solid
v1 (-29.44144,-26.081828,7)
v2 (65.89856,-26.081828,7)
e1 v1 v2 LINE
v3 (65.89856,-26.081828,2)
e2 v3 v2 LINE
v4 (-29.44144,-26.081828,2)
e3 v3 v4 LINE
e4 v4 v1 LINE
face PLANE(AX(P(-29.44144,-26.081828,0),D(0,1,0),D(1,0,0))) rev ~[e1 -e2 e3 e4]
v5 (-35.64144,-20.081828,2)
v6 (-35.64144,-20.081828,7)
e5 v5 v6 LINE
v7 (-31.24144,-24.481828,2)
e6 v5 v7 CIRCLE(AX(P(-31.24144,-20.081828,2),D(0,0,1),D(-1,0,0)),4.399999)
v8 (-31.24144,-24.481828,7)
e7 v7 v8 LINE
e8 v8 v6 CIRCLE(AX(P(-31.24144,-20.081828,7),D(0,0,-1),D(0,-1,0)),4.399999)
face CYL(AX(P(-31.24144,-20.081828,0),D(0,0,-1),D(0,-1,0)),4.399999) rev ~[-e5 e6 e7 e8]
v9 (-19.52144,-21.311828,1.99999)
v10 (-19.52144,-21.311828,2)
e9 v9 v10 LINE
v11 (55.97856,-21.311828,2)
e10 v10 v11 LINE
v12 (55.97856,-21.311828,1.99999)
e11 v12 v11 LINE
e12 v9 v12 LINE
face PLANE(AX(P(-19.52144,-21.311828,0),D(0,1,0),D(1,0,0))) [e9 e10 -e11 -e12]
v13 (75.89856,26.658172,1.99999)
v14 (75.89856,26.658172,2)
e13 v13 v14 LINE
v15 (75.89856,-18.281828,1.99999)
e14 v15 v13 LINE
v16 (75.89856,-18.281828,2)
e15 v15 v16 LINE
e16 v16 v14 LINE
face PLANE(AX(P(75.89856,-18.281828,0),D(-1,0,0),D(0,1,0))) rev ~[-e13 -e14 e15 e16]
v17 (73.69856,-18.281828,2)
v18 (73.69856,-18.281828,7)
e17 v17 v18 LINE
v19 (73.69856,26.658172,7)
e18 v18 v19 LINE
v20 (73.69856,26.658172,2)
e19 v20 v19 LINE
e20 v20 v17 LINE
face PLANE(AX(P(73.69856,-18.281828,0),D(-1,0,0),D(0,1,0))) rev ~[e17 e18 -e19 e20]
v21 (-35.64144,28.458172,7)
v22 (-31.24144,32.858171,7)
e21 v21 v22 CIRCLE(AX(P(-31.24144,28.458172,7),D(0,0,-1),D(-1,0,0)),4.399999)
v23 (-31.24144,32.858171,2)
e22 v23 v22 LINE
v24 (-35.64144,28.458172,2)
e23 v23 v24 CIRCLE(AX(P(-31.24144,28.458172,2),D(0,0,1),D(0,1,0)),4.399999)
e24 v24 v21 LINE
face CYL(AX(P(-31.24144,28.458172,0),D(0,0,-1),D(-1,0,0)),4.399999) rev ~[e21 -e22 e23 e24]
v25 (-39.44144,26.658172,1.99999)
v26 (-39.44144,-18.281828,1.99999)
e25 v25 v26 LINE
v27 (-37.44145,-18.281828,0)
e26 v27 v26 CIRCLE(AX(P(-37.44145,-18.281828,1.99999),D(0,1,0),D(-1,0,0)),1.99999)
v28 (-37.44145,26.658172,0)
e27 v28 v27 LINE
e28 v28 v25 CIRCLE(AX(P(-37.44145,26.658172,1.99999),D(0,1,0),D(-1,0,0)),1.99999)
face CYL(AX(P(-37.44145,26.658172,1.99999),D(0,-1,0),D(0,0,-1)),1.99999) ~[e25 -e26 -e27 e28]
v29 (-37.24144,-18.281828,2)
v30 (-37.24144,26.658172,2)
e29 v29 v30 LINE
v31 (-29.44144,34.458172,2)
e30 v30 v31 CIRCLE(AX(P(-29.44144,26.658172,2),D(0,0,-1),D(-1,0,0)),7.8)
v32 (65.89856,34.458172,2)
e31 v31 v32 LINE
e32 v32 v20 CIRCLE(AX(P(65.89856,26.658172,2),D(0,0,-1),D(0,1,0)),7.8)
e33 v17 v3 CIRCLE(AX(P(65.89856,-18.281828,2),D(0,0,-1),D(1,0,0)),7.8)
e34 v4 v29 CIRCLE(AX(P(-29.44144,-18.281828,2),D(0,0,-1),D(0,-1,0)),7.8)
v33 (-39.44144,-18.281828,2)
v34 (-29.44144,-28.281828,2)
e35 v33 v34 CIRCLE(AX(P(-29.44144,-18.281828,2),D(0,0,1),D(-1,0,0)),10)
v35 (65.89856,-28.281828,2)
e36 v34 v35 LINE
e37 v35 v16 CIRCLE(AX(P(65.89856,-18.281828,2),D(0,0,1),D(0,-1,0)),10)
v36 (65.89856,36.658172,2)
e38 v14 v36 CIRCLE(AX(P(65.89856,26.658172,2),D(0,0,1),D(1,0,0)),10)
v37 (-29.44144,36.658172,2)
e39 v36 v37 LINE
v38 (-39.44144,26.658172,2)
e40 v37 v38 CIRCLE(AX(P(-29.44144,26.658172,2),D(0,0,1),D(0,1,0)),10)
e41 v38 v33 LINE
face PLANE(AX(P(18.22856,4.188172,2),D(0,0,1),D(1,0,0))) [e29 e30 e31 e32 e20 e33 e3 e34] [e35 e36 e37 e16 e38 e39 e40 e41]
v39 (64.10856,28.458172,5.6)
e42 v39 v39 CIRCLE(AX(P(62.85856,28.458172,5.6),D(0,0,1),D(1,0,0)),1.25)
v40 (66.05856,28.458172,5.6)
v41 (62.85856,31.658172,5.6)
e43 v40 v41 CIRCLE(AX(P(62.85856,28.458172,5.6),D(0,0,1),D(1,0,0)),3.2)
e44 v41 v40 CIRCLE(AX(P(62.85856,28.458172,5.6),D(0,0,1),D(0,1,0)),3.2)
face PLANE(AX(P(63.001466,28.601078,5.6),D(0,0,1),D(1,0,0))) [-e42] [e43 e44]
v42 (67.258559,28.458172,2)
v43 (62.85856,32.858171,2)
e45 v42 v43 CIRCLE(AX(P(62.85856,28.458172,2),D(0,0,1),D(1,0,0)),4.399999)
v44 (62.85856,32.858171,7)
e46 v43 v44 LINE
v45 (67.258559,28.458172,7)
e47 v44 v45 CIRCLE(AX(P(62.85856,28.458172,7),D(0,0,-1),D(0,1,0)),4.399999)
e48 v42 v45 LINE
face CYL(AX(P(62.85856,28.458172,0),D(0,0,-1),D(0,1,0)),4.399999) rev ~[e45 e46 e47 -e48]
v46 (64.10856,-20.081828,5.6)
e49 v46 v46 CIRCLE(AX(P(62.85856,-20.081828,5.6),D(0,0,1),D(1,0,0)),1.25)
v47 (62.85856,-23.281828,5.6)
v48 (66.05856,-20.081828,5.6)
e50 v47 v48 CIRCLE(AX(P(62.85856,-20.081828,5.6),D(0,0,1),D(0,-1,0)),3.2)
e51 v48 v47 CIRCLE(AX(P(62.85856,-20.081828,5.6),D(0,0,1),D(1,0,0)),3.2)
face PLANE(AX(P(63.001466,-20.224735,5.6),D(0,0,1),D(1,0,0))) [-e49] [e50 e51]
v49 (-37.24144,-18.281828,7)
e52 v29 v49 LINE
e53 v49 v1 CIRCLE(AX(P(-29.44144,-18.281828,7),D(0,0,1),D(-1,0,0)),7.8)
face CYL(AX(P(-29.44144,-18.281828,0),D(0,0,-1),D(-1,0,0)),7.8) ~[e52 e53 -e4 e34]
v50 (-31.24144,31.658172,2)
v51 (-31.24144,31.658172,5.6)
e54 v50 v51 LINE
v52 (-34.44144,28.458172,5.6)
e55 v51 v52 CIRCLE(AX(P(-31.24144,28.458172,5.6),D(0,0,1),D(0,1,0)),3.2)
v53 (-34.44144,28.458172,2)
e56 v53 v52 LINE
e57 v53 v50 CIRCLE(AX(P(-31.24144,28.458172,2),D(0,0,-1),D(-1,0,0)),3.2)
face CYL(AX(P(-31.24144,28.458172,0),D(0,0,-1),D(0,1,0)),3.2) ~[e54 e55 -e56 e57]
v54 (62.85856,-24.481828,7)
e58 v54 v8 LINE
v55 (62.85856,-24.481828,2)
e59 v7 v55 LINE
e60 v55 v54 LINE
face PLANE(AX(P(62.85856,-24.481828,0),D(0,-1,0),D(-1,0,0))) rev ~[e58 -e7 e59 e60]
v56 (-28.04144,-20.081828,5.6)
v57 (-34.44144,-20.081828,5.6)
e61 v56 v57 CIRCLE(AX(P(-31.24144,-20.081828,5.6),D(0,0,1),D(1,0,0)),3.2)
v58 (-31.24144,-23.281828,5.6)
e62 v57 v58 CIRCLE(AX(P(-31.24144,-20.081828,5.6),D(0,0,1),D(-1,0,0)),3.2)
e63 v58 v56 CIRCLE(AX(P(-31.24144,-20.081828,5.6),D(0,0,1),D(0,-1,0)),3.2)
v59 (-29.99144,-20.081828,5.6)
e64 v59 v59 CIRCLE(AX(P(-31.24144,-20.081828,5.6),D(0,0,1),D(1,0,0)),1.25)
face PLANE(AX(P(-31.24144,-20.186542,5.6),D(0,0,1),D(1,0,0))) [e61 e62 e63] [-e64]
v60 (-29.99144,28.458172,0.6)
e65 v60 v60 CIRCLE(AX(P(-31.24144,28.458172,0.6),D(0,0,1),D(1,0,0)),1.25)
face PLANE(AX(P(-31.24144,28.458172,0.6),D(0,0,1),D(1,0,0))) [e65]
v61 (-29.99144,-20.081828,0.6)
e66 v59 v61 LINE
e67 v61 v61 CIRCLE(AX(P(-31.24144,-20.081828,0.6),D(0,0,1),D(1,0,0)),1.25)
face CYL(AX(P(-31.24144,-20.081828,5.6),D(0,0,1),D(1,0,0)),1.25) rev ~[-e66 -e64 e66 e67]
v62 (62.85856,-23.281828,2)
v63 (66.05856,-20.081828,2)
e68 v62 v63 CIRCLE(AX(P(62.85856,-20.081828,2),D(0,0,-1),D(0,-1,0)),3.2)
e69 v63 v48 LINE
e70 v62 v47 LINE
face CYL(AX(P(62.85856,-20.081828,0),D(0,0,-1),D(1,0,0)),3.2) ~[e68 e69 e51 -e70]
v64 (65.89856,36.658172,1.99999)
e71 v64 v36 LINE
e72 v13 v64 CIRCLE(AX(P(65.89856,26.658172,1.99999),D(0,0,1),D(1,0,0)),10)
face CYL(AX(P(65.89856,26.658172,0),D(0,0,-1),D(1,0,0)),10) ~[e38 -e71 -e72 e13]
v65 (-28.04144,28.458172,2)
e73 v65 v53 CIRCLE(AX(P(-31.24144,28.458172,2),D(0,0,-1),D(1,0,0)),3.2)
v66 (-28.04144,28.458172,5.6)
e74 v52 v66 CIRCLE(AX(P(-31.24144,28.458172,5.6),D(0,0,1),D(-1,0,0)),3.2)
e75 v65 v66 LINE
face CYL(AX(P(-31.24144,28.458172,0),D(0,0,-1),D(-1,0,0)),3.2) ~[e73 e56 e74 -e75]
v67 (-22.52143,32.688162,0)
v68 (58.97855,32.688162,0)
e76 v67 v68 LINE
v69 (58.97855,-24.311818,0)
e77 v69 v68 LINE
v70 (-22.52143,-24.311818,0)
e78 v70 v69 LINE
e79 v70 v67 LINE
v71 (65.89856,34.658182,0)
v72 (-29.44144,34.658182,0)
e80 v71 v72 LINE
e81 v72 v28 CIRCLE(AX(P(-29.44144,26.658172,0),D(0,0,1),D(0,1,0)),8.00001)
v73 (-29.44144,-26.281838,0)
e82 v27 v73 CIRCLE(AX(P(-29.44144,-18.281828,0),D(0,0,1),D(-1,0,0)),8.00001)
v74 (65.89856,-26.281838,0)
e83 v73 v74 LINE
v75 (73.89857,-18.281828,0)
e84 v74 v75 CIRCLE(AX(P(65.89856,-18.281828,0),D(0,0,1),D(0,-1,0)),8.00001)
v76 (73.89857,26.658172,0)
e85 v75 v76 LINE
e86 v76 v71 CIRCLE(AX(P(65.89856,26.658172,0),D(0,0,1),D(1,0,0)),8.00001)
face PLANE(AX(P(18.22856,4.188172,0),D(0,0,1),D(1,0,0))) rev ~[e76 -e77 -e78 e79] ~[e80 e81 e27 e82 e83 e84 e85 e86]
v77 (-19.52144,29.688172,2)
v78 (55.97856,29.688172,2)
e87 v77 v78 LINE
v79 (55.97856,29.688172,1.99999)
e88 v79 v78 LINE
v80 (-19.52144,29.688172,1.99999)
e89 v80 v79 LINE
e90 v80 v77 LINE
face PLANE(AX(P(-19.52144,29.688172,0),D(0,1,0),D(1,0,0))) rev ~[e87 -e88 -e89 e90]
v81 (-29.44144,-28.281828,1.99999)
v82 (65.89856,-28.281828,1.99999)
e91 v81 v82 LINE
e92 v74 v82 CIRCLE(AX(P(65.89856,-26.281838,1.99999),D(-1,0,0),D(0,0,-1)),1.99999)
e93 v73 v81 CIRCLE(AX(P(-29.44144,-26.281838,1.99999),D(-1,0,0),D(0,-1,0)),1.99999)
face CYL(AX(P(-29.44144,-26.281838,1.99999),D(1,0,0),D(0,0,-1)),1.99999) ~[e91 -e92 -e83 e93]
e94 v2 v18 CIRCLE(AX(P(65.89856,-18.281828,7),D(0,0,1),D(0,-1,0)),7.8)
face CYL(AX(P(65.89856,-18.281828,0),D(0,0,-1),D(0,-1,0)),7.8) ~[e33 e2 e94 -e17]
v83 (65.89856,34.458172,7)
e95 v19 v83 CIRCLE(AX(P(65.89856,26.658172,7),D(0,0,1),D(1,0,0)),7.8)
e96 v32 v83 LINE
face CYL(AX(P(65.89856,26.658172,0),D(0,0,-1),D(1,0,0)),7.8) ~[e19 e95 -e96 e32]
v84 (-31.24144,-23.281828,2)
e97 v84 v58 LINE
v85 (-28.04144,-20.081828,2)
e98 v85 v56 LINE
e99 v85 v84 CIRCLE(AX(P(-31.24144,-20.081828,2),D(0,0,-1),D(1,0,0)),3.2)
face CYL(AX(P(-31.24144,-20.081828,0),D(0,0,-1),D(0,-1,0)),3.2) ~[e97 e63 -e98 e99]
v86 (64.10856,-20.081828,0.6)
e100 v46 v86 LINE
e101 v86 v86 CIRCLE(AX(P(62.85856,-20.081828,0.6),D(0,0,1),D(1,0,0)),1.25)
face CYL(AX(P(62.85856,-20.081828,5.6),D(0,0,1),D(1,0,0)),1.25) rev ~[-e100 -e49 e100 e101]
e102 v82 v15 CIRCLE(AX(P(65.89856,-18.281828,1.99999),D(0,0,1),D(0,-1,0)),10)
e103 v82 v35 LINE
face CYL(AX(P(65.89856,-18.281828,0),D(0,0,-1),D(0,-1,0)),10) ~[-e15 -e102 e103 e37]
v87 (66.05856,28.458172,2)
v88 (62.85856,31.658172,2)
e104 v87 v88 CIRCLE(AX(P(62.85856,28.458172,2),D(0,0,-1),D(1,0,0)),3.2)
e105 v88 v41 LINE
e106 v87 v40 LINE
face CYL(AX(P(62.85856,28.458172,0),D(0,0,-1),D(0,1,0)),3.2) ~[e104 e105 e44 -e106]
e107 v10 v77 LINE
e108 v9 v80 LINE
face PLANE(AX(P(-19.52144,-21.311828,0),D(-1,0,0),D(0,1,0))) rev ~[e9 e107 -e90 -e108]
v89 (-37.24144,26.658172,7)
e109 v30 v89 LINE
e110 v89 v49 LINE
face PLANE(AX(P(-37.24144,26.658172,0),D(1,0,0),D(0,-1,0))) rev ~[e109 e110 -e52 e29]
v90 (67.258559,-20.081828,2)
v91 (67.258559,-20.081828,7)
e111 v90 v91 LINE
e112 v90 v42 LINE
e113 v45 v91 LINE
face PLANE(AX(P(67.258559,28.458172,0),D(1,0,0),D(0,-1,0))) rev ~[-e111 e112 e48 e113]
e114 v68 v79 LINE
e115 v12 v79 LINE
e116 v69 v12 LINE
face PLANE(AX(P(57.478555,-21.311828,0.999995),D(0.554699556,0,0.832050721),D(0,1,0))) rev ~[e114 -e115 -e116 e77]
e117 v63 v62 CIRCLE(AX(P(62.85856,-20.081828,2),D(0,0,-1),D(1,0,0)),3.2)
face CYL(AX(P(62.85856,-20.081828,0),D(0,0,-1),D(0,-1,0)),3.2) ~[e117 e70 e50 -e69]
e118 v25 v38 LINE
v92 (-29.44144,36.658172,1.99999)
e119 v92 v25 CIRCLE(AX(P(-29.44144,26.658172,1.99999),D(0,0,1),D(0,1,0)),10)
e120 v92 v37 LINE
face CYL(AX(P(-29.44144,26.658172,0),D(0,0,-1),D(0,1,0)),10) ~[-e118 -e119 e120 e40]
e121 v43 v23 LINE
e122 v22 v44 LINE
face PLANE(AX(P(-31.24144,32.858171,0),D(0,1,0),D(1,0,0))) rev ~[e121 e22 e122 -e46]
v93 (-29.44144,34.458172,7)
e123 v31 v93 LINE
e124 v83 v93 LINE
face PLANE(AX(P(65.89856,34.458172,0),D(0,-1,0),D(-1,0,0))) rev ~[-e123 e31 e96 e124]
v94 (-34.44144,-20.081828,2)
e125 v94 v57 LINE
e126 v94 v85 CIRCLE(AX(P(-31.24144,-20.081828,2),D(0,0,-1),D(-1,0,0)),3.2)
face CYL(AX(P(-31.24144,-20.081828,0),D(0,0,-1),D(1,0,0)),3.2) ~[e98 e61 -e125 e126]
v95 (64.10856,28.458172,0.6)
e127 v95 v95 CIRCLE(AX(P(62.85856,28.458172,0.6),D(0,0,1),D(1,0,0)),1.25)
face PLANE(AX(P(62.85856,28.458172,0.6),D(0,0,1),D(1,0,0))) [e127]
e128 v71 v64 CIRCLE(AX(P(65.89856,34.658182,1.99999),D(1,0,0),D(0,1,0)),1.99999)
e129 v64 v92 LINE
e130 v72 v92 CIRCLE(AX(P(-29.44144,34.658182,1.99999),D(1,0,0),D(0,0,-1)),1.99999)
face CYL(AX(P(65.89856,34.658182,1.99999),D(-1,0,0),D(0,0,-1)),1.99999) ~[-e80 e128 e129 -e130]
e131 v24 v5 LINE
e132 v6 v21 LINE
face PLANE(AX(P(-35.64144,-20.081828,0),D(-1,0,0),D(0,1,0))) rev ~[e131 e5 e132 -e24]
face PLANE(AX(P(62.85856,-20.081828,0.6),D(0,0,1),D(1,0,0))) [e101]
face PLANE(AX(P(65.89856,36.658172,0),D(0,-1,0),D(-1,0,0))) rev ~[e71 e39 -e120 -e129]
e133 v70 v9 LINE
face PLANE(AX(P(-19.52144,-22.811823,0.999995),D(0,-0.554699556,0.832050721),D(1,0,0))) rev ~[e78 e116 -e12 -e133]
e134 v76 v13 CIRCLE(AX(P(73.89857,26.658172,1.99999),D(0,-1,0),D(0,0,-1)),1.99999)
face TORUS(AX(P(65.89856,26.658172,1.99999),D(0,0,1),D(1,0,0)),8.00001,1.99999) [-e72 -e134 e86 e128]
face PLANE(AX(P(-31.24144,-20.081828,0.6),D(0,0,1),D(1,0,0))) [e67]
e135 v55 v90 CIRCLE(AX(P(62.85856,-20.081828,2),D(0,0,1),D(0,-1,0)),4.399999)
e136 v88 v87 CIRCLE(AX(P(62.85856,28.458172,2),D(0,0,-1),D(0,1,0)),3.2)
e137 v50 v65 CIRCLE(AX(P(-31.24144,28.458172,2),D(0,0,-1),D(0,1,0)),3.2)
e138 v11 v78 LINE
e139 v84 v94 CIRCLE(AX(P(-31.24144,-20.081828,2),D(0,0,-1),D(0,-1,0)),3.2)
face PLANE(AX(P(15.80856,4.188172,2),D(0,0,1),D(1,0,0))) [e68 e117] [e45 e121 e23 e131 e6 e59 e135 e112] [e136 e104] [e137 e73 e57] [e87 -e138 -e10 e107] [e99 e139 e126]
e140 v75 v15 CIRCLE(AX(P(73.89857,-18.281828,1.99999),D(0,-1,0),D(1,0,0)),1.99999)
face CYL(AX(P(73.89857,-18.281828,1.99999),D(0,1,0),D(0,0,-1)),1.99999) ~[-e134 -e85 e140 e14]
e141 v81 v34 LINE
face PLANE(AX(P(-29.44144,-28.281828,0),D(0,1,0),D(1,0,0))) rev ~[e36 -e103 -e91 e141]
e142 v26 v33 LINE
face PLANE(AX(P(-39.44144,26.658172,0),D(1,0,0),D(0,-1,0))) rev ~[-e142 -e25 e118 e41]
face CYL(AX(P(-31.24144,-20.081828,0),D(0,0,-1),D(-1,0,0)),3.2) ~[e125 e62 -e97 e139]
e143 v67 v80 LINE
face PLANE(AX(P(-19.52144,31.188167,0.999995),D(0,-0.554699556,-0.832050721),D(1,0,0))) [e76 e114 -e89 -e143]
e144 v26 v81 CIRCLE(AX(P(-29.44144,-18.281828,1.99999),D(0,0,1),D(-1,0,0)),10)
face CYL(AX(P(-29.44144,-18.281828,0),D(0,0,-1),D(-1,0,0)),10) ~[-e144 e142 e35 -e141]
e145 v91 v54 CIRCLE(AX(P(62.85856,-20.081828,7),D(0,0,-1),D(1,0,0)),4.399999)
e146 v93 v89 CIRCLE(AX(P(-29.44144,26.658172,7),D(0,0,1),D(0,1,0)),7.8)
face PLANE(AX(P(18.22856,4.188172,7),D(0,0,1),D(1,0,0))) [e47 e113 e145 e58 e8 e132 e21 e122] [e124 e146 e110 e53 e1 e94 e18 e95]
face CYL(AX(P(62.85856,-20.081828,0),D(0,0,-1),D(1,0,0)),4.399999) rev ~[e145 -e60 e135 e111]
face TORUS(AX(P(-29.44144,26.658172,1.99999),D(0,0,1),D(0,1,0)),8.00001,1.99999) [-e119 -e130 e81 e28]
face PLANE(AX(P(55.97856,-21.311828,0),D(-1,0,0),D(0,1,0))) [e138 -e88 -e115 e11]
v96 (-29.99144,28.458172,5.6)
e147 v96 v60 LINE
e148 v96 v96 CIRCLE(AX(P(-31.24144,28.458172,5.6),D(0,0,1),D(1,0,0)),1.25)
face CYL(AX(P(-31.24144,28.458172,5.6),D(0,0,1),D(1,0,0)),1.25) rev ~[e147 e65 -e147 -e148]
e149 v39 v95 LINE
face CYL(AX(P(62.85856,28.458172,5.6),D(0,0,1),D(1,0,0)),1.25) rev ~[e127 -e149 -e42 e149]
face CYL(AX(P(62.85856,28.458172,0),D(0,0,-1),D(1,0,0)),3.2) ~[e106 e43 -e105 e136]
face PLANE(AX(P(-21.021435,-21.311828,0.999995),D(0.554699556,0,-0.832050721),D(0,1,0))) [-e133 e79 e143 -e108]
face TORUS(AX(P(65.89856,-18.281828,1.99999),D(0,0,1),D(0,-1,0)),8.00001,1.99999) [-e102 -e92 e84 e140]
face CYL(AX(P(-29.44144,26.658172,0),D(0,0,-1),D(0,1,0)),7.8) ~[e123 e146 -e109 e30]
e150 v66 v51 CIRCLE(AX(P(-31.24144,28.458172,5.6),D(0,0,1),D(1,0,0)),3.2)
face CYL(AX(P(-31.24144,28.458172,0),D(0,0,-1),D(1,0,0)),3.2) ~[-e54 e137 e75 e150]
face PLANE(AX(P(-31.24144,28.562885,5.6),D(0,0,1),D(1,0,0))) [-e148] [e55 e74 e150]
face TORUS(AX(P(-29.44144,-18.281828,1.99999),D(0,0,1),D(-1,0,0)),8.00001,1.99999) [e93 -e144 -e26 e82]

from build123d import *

# Parameters (mm, degrees)
F1_DEPTH = 5.6
F2_DEPTH = 7
F0_W     = 75.5
F0_H     = 51
F3_DEPTH = 2
F4_R     = 1.99999
F5_SIZE2 = 1.99999
F5_SIZE  = 2.99999
F6_R     = 1.25
F7_DEPTH = 5


# Not quite as in the source:
# - a fillet or chamfer is up to 0.001 mm smaller than in the source, because OpenCascade refuses the exact size


with BuildPart() as f1:
    # F0 (on Top) → F1 (new body)
    with BuildSketch(Plane.XY):
        with BuildLine():
            ThreePointArc((-34.4414402544, 28.4581715763), (-31.2414402544, 25.2581715763), (-28.0414402544, 28.4581715763))
            ThreePointArc((-28.0414402544, 28.4581715763), (-28.9786985547, 30.7209132761), (-31.2414402544, 31.6581715763))
            ThreePointArc((-31.2414402544, 31.6581715763), (-33.5041819542, 30.7209132761), (-34.4414402544, 28.4581715763))
        make_face()
    extrude(amount=F1_DEPTH)



with BuildPart() as f1b:
    # F0 (on Top) → F1, piece 2 (new body)
    with BuildSketch(Plane.XY):
        with BuildLine():
            ThreePointArc((-28.0414402544, -20.0818284237), (-31.2414402544, -16.8818284237), (-34.4414402544, -20.0818284237))
            ThreePointArc((-34.4414402544, -20.0818284237), (-33.5041819542, -22.3445701235), (-31.2414402544, -23.2818284237))
            ThreePointArc((-31.2414402544, -23.2818284237), (-28.9786985547, -22.3445701235), (-28.0414402544, -20.0818284237))
        make_face()
    extrude(amount=F1_DEPTH)


with BuildPart() as f1c:
    # F0 (on Top) → F1, piece 3 (new body)
    with BuildSketch(Plane.XY):
        with BuildLine():
            ThreePointArc((62.8585597456, -23.2818284237), (65.1213014453, -22.3445701235), (66.0585597456, -20.0818284237))
            ThreePointArc((66.0585597456, -20.0818284237), (60.5958180458, -17.8190867239), (62.8585597456, -23.2818284237))
        make_face()
    extrude(amount=F1_DEPTH)


with BuildPart() as f1d:
    # F0 (on Top) → F1, piece 4 (new body)
    with BuildSketch(Plane.XY):
        with BuildLine():
            ThreePointArc((66.0585597456, 28.4581715763), (65.1213014453, 30.7209132761), (62.8585597456, 31.6581715763))
            ThreePointArc((62.8585597456, 31.6581715763), (60.5958180458, 26.1954298765), (66.0585597456, 28.4581715763))
        make_face()
    extrude(amount=F1_DEPTH)


with BuildPart() as f2:
    # F0 (on Top) → F2 (new body)
    with BuildSketch(Plane.XY):
        with BuildLine():
            Line((65.8985597456, 34.4581715763), (-29.4414402544, 34.4581715763))
            ThreePointArc((-29.4414402544, 34.4581715763), (-34.9568731477, 32.1736044695), (-37.2414402544, 26.6581715763))
            Line((-37.2414402544, 26.6581715763), (-37.2414402544, -18.2818284237))
            ThreePointArc((-37.2414402544, -18.2818284237), (-34.9568731477, -23.797261317), (-29.4414402544, -26.0818284237))
            Line((-29.4414402544, -26.0818284237), (65.8985597456, -26.0818284237))
            ThreePointArc((65.8985597456, -26.0818284237), (71.4139926388, -23.797261317), (73.6985597456, -18.2818284237))
            Line((73.6985597456, -18.2818284237), (73.6985597456, 26.6581715763))
            ThreePointArc((73.6985597456, 26.6581715763), (71.4139926388, 32.1736044695), (65.8985597456, 34.4581715763))
        make_face()
        with BuildLine():
            ThreePointArc((62.8585597456, 32.8581709981), (65.9698291739, 31.5694410047), (67.2585591674, 28.4581715763))
            Line((67.2585591674, 28.4581715763), (67.2585591674, -20.0818284237))
            ThreePointArc((67.2585591674, -20.0818284237), (65.9698291739, -23.1930978521), (62.8585597456, -24.4818278456))
            Line((62.8585597456, -24.4818278456), (-31.2414402544, -24.4818278456))
            ThreePointArc((-31.2414402544, -24.4818278456), (-34.3527096828, -23.1930978521), (-35.6414396763, -20.0818284237))
            Line((-35.6414396763, -20.0818284237), (-35.6414396763, 28.4581715763))
            ThreePointArc((-35.6414396763, 28.4581715763), (-34.3527096828, 31.5694410047), (-31.2414402544, 32.8581709981))
            Line((-31.2414402544, 32.8581709981), (62.8585597456, 32.8581709981))
        make_face(mode=Mode.SUBTRACT)
    extrude(amount=F2_DEPTH)


with BuildPart() as f1_1:
    add(f1.part)

    add(f1b.part)  # F3 merges F1b

    add(f1c.part)  # F3 merges F1c

    add(f1d.part)  # F3 merges F1d

    add(f2.part)  # F3 merges F2
    # F0 (on Top) → F3 (join)
    with BuildSketch(Plane.XY):
        with BuildLine():
            Line((65.8985597456, 36.6581715763), (-29.4414402544, 36.6581715763))
            ThreePointArc((-29.4414402544, 36.6581715763), (-36.5125080663, 33.7292393881), (-39.4414402544, 26.6581715763))
            Line((-39.4414402544, 26.6581715763), (-39.4414402544, -18.2818284237))
            ThreePointArc((-39.4414402544, -18.2818284237), (-36.5125080663, -25.3528962356), (-29.4414402544, -28.2818284237))
            Line((-29.4414402544, -28.2818284237), (65.8985597456, -28.2818284237))
            ThreePointArc((65.8985597456, -28.2818284237), (72.9696275574, -25.3528962356), (75.8985597456, -18.2818284237))
            Line((75.8985597456, -18.2818284237), (75.8985597456, 26.6581715763))
            ThreePointArc((75.8985597456, 26.6581715763), (72.9696275574, 33.7292393881), (65.8985597456, 36.6581715763))
        make_face()
        with BuildLine():
            ThreePointArc((-37.2414402544, 26.6581715763), (-34.9568731477, 32.1736044695), (-29.4414402544, 34.4581715763))
            Line((-29.4414402544, 34.4581715763), (65.8985597456, 34.4581715763))
            ThreePointArc((65.8985597456, 34.4581715763), (71.4139926388, 32.1736044695), (73.6985597456, 26.6581715763))
            Line((73.6985597456, 26.6581715763), (73.6985597456, -18.2818284237))
            ThreePointArc((73.6985597456, -18.2818284237), (71.4139926388, -23.797261317), (65.8985597456, -26.0818284237))
            Line((65.8985597456, -26.0818284237), (-29.4414402544, -26.0818284237))
            ThreePointArc((-29.4414402544, -26.0818284237), (-34.9568731477, -23.797261317), (-37.2414402544, -18.2818284237))
            Line((-37.2414402544, -18.2818284237), (-37.2414402544, 26.6581715763))
        make_face(mode=Mode.SUBTRACT)
        with BuildLine():
            Line((67.2585591674, -20.0818284237), (67.2585591674, 28.4581715763))
            ThreePointArc((67.2585591674, 28.4581715763), (65.9698291739, 31.5694410047), (62.8585597456, 32.8581709981))
            Line((62.8585597456, 32.8581709981), (-31.2414402544, 32.8581709981))
            ThreePointArc((-31.2414402544, 32.8581709981), (-34.3527096828, 31.5694410047), (-35.6414396763, 28.4581715763))
            Line((-35.6414396763, 28.4581715763), (-35.6414396763, -20.0818284237))
            ThreePointArc((-35.6414396763, -20.0818284237), (-34.3527096828, -23.1930978521), (-31.2414402544, -24.4818278456))
            Line((-31.2414402544, -24.4818278456), (62.8585597456, -24.4818278456))
            ThreePointArc((62.8585597456, -24.4818278456), (65.9698291739, -23.1930978521), (67.2585591674, -20.0818284237))
        make_face()
        with BuildLine():
            ThreePointArc((-34.4414402544, 28.4581715763), (-33.5041819542, 30.7209132761), (-31.2414402544, 31.6581715763))
            Line((-31.2414402544, 31.6581715763), (62.8585597456, 31.6581715763))
            ThreePointArc((62.8585597456, 31.6581715763), (65.1213014453, 30.7209132761), (66.0585597456, 28.4581715763))
            Line((66.0585597456, 28.4581715763), (66.0585597456, -20.0818284237))
            ThreePointArc((66.0585597456, -20.0818284237), (65.1213014453, -22.3445701235), (62.8585597456, -23.2818284237))
            Line((62.8585597456, -23.2818284237), (-31.2414402544, -23.2818284237))
            ThreePointArc((-31.2414402544, -23.2818284237), (-33.5041819542, -22.3445701235), (-34.4414402544, -20.0818284237))
            Line((-34.4414402544, -20.0818284237), (-34.4414402544, 28.4581715763))
        make_face(mode=Mode.SUBTRACT)
        with BuildLine():
            ThreePointArc((-31.2414402544, 31.6581715763), (-28.9786985547, 30.7209132761), (-28.0414402544, 28.4581715763))
            ThreePointArc((-28.0414402544, 28.4581715763), (-31.2414402544, 25.2581715763), (-34.4414402544, 28.4581715763))
            Line((-34.4414402544, 28.4581715763), (-34.4414402544, -20.0818284237))
            ThreePointArc((-34.4414402544, -20.0818284237), (-31.2414402544, -16.8818284237), (-28.0414402544, -20.0818284237))
            ThreePointArc((-28.0414402544, -20.0818284237), (-28.9786985547, -22.3445701235), (-31.2414402544, -23.2818284237))
            Line((-31.2414402544, -23.2818284237), (62.8585597456, -23.2818284237))
            ThreePointArc((62.8585597456, -23.2818284237), (60.5958180458, -17.8190867239), (66.0585597456, -20.0818284237))
            Line((66.0585597456, -20.0818284237), (66.0585597456, 28.4581715763))
            ThreePointArc((66.0585597456, 28.4581715763), (60.5958180458, 26.1954298765), (62.8585597456, 31.6581715763))
            Line((62.8585597456, 31.6581715763), (-31.2414402544, 31.6581715763))
        make_face()
        with Locations((18.2285597456, 4.1881715763)):
            Rectangle(F0_W, F0_H, mode=Mode.SUBTRACT)
    extrude(amount=F3_DEPTH)

    # F4 (radius 2 in the source; OpenCascade refuses exactly that, so slightly less here)
    f4_edges = [f1_1.edges().sort_by_distance(p)[0] for p in [
        (-36.512508, -25.352896, 0),
    ]]
    fillet(f4_edges, radius=F4_R)

    # F5 (size 3 and 2 in the source; OpenCascade refuses exactly that, so slightly less here)
    f5_edges = [f1_1.edges().sort_by_distance(p)[0] for p in [
        (18.22856, 29.688172, 0),
        (-19.52144, 4.188172, 0),
        (18.22856, -21.311828, 0),
        (55.97856, 4.188172, 0),
    ]]
    f5_side = f1_1.faces().sort_by_distance((-34.200797, -23.041185, 0))[0]
    chamfer(f5_edges, length=F5_SIZE, length2=F5_SIZE2, reference=f5_side)

    # F6 (on face) → F7 (cut)
    with BuildSketch(Plane.XY.offset(5.6)):
        with Locations((-31.2414402544, 28.4581715763)):
            Circle(F6_R)
        with Locations((-31.2414402544, -20.0818284237)):
            Circle(F6_R)
        with Locations((62.8585597456, -20.0818284237)):
            Circle(F6_R)
        with Locations((62.8585597456, 28.4581715763)):
            Circle(F6_R)
    extrude(amount=-F7_DEPTH, mode=Mode.SUBTRACT)


solid = f1_1.part
